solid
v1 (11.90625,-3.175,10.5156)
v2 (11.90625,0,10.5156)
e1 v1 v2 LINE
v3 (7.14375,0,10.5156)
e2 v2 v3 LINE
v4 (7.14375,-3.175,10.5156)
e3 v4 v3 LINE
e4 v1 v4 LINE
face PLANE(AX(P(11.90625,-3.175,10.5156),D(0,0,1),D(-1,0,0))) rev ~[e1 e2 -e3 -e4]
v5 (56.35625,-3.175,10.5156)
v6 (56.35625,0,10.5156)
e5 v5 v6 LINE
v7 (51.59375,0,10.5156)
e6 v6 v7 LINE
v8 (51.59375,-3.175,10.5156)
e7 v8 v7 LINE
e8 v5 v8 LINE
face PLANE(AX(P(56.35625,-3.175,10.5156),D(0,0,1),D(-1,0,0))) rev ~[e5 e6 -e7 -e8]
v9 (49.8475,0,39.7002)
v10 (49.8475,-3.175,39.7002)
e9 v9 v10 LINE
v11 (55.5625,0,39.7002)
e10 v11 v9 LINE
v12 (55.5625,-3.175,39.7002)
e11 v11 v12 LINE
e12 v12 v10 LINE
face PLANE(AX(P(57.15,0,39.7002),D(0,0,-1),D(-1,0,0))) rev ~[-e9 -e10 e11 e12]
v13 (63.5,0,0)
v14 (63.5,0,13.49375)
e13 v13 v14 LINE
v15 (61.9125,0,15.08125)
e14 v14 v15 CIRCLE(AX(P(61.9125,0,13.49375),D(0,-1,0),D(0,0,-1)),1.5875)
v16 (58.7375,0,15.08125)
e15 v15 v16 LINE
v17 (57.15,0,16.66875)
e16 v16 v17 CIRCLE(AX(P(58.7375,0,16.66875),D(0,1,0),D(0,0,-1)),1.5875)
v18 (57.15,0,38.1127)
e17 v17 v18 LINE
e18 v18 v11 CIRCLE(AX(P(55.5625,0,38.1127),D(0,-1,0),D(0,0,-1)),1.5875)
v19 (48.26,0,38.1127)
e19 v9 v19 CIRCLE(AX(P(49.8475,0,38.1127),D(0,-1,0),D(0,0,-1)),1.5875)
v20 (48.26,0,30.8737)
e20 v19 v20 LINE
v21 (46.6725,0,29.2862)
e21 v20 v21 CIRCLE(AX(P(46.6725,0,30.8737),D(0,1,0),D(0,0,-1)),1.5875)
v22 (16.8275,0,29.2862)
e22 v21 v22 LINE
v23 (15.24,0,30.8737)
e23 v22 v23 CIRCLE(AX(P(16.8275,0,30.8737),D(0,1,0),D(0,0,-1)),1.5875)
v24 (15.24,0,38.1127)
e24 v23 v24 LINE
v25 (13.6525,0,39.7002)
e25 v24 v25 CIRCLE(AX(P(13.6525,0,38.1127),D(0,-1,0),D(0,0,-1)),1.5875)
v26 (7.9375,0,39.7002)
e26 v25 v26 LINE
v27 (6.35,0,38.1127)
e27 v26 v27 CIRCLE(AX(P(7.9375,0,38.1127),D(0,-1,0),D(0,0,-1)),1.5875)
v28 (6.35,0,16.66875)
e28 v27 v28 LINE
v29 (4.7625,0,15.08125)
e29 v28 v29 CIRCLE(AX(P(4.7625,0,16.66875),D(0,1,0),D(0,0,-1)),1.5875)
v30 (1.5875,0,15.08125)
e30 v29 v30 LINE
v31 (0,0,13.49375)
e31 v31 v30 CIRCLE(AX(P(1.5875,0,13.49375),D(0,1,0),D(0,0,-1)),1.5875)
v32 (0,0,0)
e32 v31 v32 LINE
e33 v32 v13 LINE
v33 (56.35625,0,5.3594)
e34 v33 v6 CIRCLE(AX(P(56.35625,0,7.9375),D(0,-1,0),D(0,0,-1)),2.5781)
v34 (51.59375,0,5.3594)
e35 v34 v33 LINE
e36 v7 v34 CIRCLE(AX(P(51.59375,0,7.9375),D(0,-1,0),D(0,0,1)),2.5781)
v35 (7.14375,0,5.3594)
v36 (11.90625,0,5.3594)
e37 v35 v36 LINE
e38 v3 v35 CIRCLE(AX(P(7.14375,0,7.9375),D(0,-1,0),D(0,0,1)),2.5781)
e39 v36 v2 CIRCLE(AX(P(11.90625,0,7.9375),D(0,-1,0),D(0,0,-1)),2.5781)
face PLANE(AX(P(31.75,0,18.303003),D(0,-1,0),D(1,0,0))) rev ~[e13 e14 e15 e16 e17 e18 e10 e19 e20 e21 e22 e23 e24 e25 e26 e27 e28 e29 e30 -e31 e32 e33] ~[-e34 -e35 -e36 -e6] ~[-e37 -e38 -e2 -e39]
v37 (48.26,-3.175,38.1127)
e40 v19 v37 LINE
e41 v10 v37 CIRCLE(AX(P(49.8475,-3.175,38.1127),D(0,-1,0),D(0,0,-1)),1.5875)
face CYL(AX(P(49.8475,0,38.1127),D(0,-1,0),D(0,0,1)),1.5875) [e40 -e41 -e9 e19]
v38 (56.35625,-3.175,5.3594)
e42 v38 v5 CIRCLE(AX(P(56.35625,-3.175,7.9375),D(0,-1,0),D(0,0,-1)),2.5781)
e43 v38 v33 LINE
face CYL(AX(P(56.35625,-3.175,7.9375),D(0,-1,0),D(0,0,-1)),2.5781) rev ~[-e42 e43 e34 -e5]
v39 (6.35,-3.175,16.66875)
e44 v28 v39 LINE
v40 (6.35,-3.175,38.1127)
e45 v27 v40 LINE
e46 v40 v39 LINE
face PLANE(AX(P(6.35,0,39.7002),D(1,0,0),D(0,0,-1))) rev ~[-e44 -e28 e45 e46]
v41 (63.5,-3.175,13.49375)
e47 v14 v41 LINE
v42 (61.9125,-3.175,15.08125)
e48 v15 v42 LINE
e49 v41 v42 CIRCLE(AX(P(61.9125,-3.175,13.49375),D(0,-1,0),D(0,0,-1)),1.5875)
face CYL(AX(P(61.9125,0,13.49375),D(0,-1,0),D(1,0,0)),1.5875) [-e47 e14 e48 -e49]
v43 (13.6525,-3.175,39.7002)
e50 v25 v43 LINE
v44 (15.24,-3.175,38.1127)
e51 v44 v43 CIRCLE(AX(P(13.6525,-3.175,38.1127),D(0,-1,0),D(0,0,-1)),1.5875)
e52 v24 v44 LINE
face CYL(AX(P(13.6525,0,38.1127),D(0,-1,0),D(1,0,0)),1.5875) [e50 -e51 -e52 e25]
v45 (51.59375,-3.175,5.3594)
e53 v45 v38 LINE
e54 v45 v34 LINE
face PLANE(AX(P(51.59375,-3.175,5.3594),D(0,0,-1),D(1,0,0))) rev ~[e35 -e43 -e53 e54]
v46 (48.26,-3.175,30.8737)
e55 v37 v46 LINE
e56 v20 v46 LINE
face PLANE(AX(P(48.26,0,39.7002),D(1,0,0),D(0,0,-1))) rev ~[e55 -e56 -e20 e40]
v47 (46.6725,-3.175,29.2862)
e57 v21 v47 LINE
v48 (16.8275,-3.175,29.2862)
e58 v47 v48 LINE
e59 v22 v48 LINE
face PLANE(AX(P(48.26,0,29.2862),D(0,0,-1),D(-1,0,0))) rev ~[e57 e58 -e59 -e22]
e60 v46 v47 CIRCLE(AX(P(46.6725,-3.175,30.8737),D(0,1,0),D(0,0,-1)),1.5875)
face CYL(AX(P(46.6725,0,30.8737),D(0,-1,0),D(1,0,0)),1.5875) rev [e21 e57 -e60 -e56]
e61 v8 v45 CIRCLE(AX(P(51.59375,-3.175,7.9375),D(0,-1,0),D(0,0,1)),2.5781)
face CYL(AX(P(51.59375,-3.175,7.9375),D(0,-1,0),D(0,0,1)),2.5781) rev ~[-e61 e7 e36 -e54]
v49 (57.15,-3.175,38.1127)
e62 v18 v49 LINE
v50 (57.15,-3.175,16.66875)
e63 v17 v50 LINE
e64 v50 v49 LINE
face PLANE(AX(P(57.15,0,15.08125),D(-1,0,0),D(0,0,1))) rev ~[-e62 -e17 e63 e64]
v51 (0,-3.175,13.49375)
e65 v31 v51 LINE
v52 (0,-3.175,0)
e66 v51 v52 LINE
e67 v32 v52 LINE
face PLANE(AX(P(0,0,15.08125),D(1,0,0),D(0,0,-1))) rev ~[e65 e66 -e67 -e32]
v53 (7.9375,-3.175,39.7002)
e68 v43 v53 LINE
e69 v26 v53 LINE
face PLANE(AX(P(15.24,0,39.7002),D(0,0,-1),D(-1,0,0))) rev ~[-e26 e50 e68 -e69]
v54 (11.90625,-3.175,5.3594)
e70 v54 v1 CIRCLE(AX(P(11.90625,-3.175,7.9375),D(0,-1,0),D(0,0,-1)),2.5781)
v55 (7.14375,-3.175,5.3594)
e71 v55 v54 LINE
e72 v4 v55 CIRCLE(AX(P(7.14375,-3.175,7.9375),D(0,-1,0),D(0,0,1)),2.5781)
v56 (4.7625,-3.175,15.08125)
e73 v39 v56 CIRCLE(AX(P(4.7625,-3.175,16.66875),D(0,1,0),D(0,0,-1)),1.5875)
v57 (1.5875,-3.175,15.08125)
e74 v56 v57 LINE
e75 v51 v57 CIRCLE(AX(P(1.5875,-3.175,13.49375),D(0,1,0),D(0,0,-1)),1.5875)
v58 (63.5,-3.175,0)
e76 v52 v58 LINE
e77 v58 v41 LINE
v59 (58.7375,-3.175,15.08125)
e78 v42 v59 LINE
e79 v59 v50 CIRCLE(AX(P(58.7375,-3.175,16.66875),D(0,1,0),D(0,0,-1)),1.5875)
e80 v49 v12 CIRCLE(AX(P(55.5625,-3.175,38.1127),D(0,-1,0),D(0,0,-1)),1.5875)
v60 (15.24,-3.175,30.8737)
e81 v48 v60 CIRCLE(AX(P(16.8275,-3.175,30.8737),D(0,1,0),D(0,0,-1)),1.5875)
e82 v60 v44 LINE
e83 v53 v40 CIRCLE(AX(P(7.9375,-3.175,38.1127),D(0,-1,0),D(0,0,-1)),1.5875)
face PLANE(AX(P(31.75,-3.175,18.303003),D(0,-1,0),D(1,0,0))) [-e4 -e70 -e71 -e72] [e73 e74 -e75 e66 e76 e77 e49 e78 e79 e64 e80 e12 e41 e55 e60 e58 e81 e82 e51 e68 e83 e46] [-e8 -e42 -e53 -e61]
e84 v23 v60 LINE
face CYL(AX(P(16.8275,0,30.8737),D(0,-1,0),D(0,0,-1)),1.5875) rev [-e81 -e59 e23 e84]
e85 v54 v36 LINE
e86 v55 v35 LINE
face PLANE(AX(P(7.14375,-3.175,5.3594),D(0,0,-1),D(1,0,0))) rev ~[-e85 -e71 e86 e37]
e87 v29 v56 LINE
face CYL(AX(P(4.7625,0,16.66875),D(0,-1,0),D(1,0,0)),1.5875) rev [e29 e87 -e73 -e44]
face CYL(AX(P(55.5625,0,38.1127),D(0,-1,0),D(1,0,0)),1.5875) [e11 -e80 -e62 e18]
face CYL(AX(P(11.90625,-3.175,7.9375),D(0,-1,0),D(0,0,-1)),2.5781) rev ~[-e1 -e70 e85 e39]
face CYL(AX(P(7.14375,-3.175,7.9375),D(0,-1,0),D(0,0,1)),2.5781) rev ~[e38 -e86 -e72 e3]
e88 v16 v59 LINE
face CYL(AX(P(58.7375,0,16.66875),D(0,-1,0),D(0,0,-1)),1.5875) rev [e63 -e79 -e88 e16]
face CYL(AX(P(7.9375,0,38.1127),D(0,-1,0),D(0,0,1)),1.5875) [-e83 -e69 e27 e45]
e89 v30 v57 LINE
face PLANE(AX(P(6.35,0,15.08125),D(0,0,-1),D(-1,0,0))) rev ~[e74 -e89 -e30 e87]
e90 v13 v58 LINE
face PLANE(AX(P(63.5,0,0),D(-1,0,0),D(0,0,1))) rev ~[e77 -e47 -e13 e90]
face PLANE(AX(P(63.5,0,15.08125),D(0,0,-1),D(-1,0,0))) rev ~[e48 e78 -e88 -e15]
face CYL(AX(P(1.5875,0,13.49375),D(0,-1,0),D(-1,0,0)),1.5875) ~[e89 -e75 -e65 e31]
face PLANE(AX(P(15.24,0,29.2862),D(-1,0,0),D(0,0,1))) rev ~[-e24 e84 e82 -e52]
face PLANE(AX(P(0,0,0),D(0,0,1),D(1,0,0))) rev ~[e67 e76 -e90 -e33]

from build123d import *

# Parameters (mm, degrees)
F1_DEPTH = 3.175
F2_R     = 1.5875
F4_DEPTH = 3.175


with BuildPart() as f1:
    # F0 (on Front) → F1 (new body)
    with BuildSketch(Plane.XZ):
        Polygon((0, 15.08125), (0, 0), (63.5, 0), (63.5, 15.08125), (57.15, 15.08125), (57.15, 39.7002), (48.26, 39.7002), (48.26, 29.2862), (15.24, 29.2862), (15.24, 39.7002), (6.35, 39.7002), (6.35, 15.08125), align=None)
    extrude(amount=F1_DEPTH)

    # F2
    f2_edges = [f1.edges().sort_by_distance(p)[0] for p in [
        (6.35, -1.5875, 39.7002),
        (6.35, -1.5875, 15.08125),
        (0, -1.5875, 15.08125),
        (15.24, -1.5875, 39.7002),
        (48.26, -1.5875, 39.7002),
        (57.15, -1.5875, 39.7002),
        (57.15, -1.5875, 15.08125),
        (63.5, -1.5875, 15.08125),
        (48.26, -1.5875, 29.2862),
        (15.24, -1.5875, 29.2862),
    ]]
    fillet(f2_edges, radius=F2_R)

    # F3 (on face) → F4 (cut)
    with BuildSketch(Plane.XZ.offset(3.175)):
        with BuildLine():
            Line((51.59375, 5.3594), (56.35625, 5.3594))
            ThreePointArc((56.35625, 5.3594), (58.93435, 7.9375), (56.35625, 10.5156))
            Line((56.35625, 10.5156), (51.59375, 10.5156))
            ThreePointArc((51.59375, 10.5156), (49.01565, 7.9375), (51.59375, 5.3594))
        make_face()
        with BuildLine():
            Line((7.14375, 5.3594), (11.90625, 5.3594))
            ThreePointArc((11.90625, 5.3594), (14.48435, 7.9375), (11.90625, 10.5156))
            Line((11.90625, 10.5156), (7.14375, 10.5156))
            ThreePointArc((7.14375, 10.5156), (4.56565, 7.9375), (7.14375, 5.3594))
        make_face()
    extrude(amount=-F4_DEPTH, mode=Mode.SUBTRACT)


solid = f1.part
